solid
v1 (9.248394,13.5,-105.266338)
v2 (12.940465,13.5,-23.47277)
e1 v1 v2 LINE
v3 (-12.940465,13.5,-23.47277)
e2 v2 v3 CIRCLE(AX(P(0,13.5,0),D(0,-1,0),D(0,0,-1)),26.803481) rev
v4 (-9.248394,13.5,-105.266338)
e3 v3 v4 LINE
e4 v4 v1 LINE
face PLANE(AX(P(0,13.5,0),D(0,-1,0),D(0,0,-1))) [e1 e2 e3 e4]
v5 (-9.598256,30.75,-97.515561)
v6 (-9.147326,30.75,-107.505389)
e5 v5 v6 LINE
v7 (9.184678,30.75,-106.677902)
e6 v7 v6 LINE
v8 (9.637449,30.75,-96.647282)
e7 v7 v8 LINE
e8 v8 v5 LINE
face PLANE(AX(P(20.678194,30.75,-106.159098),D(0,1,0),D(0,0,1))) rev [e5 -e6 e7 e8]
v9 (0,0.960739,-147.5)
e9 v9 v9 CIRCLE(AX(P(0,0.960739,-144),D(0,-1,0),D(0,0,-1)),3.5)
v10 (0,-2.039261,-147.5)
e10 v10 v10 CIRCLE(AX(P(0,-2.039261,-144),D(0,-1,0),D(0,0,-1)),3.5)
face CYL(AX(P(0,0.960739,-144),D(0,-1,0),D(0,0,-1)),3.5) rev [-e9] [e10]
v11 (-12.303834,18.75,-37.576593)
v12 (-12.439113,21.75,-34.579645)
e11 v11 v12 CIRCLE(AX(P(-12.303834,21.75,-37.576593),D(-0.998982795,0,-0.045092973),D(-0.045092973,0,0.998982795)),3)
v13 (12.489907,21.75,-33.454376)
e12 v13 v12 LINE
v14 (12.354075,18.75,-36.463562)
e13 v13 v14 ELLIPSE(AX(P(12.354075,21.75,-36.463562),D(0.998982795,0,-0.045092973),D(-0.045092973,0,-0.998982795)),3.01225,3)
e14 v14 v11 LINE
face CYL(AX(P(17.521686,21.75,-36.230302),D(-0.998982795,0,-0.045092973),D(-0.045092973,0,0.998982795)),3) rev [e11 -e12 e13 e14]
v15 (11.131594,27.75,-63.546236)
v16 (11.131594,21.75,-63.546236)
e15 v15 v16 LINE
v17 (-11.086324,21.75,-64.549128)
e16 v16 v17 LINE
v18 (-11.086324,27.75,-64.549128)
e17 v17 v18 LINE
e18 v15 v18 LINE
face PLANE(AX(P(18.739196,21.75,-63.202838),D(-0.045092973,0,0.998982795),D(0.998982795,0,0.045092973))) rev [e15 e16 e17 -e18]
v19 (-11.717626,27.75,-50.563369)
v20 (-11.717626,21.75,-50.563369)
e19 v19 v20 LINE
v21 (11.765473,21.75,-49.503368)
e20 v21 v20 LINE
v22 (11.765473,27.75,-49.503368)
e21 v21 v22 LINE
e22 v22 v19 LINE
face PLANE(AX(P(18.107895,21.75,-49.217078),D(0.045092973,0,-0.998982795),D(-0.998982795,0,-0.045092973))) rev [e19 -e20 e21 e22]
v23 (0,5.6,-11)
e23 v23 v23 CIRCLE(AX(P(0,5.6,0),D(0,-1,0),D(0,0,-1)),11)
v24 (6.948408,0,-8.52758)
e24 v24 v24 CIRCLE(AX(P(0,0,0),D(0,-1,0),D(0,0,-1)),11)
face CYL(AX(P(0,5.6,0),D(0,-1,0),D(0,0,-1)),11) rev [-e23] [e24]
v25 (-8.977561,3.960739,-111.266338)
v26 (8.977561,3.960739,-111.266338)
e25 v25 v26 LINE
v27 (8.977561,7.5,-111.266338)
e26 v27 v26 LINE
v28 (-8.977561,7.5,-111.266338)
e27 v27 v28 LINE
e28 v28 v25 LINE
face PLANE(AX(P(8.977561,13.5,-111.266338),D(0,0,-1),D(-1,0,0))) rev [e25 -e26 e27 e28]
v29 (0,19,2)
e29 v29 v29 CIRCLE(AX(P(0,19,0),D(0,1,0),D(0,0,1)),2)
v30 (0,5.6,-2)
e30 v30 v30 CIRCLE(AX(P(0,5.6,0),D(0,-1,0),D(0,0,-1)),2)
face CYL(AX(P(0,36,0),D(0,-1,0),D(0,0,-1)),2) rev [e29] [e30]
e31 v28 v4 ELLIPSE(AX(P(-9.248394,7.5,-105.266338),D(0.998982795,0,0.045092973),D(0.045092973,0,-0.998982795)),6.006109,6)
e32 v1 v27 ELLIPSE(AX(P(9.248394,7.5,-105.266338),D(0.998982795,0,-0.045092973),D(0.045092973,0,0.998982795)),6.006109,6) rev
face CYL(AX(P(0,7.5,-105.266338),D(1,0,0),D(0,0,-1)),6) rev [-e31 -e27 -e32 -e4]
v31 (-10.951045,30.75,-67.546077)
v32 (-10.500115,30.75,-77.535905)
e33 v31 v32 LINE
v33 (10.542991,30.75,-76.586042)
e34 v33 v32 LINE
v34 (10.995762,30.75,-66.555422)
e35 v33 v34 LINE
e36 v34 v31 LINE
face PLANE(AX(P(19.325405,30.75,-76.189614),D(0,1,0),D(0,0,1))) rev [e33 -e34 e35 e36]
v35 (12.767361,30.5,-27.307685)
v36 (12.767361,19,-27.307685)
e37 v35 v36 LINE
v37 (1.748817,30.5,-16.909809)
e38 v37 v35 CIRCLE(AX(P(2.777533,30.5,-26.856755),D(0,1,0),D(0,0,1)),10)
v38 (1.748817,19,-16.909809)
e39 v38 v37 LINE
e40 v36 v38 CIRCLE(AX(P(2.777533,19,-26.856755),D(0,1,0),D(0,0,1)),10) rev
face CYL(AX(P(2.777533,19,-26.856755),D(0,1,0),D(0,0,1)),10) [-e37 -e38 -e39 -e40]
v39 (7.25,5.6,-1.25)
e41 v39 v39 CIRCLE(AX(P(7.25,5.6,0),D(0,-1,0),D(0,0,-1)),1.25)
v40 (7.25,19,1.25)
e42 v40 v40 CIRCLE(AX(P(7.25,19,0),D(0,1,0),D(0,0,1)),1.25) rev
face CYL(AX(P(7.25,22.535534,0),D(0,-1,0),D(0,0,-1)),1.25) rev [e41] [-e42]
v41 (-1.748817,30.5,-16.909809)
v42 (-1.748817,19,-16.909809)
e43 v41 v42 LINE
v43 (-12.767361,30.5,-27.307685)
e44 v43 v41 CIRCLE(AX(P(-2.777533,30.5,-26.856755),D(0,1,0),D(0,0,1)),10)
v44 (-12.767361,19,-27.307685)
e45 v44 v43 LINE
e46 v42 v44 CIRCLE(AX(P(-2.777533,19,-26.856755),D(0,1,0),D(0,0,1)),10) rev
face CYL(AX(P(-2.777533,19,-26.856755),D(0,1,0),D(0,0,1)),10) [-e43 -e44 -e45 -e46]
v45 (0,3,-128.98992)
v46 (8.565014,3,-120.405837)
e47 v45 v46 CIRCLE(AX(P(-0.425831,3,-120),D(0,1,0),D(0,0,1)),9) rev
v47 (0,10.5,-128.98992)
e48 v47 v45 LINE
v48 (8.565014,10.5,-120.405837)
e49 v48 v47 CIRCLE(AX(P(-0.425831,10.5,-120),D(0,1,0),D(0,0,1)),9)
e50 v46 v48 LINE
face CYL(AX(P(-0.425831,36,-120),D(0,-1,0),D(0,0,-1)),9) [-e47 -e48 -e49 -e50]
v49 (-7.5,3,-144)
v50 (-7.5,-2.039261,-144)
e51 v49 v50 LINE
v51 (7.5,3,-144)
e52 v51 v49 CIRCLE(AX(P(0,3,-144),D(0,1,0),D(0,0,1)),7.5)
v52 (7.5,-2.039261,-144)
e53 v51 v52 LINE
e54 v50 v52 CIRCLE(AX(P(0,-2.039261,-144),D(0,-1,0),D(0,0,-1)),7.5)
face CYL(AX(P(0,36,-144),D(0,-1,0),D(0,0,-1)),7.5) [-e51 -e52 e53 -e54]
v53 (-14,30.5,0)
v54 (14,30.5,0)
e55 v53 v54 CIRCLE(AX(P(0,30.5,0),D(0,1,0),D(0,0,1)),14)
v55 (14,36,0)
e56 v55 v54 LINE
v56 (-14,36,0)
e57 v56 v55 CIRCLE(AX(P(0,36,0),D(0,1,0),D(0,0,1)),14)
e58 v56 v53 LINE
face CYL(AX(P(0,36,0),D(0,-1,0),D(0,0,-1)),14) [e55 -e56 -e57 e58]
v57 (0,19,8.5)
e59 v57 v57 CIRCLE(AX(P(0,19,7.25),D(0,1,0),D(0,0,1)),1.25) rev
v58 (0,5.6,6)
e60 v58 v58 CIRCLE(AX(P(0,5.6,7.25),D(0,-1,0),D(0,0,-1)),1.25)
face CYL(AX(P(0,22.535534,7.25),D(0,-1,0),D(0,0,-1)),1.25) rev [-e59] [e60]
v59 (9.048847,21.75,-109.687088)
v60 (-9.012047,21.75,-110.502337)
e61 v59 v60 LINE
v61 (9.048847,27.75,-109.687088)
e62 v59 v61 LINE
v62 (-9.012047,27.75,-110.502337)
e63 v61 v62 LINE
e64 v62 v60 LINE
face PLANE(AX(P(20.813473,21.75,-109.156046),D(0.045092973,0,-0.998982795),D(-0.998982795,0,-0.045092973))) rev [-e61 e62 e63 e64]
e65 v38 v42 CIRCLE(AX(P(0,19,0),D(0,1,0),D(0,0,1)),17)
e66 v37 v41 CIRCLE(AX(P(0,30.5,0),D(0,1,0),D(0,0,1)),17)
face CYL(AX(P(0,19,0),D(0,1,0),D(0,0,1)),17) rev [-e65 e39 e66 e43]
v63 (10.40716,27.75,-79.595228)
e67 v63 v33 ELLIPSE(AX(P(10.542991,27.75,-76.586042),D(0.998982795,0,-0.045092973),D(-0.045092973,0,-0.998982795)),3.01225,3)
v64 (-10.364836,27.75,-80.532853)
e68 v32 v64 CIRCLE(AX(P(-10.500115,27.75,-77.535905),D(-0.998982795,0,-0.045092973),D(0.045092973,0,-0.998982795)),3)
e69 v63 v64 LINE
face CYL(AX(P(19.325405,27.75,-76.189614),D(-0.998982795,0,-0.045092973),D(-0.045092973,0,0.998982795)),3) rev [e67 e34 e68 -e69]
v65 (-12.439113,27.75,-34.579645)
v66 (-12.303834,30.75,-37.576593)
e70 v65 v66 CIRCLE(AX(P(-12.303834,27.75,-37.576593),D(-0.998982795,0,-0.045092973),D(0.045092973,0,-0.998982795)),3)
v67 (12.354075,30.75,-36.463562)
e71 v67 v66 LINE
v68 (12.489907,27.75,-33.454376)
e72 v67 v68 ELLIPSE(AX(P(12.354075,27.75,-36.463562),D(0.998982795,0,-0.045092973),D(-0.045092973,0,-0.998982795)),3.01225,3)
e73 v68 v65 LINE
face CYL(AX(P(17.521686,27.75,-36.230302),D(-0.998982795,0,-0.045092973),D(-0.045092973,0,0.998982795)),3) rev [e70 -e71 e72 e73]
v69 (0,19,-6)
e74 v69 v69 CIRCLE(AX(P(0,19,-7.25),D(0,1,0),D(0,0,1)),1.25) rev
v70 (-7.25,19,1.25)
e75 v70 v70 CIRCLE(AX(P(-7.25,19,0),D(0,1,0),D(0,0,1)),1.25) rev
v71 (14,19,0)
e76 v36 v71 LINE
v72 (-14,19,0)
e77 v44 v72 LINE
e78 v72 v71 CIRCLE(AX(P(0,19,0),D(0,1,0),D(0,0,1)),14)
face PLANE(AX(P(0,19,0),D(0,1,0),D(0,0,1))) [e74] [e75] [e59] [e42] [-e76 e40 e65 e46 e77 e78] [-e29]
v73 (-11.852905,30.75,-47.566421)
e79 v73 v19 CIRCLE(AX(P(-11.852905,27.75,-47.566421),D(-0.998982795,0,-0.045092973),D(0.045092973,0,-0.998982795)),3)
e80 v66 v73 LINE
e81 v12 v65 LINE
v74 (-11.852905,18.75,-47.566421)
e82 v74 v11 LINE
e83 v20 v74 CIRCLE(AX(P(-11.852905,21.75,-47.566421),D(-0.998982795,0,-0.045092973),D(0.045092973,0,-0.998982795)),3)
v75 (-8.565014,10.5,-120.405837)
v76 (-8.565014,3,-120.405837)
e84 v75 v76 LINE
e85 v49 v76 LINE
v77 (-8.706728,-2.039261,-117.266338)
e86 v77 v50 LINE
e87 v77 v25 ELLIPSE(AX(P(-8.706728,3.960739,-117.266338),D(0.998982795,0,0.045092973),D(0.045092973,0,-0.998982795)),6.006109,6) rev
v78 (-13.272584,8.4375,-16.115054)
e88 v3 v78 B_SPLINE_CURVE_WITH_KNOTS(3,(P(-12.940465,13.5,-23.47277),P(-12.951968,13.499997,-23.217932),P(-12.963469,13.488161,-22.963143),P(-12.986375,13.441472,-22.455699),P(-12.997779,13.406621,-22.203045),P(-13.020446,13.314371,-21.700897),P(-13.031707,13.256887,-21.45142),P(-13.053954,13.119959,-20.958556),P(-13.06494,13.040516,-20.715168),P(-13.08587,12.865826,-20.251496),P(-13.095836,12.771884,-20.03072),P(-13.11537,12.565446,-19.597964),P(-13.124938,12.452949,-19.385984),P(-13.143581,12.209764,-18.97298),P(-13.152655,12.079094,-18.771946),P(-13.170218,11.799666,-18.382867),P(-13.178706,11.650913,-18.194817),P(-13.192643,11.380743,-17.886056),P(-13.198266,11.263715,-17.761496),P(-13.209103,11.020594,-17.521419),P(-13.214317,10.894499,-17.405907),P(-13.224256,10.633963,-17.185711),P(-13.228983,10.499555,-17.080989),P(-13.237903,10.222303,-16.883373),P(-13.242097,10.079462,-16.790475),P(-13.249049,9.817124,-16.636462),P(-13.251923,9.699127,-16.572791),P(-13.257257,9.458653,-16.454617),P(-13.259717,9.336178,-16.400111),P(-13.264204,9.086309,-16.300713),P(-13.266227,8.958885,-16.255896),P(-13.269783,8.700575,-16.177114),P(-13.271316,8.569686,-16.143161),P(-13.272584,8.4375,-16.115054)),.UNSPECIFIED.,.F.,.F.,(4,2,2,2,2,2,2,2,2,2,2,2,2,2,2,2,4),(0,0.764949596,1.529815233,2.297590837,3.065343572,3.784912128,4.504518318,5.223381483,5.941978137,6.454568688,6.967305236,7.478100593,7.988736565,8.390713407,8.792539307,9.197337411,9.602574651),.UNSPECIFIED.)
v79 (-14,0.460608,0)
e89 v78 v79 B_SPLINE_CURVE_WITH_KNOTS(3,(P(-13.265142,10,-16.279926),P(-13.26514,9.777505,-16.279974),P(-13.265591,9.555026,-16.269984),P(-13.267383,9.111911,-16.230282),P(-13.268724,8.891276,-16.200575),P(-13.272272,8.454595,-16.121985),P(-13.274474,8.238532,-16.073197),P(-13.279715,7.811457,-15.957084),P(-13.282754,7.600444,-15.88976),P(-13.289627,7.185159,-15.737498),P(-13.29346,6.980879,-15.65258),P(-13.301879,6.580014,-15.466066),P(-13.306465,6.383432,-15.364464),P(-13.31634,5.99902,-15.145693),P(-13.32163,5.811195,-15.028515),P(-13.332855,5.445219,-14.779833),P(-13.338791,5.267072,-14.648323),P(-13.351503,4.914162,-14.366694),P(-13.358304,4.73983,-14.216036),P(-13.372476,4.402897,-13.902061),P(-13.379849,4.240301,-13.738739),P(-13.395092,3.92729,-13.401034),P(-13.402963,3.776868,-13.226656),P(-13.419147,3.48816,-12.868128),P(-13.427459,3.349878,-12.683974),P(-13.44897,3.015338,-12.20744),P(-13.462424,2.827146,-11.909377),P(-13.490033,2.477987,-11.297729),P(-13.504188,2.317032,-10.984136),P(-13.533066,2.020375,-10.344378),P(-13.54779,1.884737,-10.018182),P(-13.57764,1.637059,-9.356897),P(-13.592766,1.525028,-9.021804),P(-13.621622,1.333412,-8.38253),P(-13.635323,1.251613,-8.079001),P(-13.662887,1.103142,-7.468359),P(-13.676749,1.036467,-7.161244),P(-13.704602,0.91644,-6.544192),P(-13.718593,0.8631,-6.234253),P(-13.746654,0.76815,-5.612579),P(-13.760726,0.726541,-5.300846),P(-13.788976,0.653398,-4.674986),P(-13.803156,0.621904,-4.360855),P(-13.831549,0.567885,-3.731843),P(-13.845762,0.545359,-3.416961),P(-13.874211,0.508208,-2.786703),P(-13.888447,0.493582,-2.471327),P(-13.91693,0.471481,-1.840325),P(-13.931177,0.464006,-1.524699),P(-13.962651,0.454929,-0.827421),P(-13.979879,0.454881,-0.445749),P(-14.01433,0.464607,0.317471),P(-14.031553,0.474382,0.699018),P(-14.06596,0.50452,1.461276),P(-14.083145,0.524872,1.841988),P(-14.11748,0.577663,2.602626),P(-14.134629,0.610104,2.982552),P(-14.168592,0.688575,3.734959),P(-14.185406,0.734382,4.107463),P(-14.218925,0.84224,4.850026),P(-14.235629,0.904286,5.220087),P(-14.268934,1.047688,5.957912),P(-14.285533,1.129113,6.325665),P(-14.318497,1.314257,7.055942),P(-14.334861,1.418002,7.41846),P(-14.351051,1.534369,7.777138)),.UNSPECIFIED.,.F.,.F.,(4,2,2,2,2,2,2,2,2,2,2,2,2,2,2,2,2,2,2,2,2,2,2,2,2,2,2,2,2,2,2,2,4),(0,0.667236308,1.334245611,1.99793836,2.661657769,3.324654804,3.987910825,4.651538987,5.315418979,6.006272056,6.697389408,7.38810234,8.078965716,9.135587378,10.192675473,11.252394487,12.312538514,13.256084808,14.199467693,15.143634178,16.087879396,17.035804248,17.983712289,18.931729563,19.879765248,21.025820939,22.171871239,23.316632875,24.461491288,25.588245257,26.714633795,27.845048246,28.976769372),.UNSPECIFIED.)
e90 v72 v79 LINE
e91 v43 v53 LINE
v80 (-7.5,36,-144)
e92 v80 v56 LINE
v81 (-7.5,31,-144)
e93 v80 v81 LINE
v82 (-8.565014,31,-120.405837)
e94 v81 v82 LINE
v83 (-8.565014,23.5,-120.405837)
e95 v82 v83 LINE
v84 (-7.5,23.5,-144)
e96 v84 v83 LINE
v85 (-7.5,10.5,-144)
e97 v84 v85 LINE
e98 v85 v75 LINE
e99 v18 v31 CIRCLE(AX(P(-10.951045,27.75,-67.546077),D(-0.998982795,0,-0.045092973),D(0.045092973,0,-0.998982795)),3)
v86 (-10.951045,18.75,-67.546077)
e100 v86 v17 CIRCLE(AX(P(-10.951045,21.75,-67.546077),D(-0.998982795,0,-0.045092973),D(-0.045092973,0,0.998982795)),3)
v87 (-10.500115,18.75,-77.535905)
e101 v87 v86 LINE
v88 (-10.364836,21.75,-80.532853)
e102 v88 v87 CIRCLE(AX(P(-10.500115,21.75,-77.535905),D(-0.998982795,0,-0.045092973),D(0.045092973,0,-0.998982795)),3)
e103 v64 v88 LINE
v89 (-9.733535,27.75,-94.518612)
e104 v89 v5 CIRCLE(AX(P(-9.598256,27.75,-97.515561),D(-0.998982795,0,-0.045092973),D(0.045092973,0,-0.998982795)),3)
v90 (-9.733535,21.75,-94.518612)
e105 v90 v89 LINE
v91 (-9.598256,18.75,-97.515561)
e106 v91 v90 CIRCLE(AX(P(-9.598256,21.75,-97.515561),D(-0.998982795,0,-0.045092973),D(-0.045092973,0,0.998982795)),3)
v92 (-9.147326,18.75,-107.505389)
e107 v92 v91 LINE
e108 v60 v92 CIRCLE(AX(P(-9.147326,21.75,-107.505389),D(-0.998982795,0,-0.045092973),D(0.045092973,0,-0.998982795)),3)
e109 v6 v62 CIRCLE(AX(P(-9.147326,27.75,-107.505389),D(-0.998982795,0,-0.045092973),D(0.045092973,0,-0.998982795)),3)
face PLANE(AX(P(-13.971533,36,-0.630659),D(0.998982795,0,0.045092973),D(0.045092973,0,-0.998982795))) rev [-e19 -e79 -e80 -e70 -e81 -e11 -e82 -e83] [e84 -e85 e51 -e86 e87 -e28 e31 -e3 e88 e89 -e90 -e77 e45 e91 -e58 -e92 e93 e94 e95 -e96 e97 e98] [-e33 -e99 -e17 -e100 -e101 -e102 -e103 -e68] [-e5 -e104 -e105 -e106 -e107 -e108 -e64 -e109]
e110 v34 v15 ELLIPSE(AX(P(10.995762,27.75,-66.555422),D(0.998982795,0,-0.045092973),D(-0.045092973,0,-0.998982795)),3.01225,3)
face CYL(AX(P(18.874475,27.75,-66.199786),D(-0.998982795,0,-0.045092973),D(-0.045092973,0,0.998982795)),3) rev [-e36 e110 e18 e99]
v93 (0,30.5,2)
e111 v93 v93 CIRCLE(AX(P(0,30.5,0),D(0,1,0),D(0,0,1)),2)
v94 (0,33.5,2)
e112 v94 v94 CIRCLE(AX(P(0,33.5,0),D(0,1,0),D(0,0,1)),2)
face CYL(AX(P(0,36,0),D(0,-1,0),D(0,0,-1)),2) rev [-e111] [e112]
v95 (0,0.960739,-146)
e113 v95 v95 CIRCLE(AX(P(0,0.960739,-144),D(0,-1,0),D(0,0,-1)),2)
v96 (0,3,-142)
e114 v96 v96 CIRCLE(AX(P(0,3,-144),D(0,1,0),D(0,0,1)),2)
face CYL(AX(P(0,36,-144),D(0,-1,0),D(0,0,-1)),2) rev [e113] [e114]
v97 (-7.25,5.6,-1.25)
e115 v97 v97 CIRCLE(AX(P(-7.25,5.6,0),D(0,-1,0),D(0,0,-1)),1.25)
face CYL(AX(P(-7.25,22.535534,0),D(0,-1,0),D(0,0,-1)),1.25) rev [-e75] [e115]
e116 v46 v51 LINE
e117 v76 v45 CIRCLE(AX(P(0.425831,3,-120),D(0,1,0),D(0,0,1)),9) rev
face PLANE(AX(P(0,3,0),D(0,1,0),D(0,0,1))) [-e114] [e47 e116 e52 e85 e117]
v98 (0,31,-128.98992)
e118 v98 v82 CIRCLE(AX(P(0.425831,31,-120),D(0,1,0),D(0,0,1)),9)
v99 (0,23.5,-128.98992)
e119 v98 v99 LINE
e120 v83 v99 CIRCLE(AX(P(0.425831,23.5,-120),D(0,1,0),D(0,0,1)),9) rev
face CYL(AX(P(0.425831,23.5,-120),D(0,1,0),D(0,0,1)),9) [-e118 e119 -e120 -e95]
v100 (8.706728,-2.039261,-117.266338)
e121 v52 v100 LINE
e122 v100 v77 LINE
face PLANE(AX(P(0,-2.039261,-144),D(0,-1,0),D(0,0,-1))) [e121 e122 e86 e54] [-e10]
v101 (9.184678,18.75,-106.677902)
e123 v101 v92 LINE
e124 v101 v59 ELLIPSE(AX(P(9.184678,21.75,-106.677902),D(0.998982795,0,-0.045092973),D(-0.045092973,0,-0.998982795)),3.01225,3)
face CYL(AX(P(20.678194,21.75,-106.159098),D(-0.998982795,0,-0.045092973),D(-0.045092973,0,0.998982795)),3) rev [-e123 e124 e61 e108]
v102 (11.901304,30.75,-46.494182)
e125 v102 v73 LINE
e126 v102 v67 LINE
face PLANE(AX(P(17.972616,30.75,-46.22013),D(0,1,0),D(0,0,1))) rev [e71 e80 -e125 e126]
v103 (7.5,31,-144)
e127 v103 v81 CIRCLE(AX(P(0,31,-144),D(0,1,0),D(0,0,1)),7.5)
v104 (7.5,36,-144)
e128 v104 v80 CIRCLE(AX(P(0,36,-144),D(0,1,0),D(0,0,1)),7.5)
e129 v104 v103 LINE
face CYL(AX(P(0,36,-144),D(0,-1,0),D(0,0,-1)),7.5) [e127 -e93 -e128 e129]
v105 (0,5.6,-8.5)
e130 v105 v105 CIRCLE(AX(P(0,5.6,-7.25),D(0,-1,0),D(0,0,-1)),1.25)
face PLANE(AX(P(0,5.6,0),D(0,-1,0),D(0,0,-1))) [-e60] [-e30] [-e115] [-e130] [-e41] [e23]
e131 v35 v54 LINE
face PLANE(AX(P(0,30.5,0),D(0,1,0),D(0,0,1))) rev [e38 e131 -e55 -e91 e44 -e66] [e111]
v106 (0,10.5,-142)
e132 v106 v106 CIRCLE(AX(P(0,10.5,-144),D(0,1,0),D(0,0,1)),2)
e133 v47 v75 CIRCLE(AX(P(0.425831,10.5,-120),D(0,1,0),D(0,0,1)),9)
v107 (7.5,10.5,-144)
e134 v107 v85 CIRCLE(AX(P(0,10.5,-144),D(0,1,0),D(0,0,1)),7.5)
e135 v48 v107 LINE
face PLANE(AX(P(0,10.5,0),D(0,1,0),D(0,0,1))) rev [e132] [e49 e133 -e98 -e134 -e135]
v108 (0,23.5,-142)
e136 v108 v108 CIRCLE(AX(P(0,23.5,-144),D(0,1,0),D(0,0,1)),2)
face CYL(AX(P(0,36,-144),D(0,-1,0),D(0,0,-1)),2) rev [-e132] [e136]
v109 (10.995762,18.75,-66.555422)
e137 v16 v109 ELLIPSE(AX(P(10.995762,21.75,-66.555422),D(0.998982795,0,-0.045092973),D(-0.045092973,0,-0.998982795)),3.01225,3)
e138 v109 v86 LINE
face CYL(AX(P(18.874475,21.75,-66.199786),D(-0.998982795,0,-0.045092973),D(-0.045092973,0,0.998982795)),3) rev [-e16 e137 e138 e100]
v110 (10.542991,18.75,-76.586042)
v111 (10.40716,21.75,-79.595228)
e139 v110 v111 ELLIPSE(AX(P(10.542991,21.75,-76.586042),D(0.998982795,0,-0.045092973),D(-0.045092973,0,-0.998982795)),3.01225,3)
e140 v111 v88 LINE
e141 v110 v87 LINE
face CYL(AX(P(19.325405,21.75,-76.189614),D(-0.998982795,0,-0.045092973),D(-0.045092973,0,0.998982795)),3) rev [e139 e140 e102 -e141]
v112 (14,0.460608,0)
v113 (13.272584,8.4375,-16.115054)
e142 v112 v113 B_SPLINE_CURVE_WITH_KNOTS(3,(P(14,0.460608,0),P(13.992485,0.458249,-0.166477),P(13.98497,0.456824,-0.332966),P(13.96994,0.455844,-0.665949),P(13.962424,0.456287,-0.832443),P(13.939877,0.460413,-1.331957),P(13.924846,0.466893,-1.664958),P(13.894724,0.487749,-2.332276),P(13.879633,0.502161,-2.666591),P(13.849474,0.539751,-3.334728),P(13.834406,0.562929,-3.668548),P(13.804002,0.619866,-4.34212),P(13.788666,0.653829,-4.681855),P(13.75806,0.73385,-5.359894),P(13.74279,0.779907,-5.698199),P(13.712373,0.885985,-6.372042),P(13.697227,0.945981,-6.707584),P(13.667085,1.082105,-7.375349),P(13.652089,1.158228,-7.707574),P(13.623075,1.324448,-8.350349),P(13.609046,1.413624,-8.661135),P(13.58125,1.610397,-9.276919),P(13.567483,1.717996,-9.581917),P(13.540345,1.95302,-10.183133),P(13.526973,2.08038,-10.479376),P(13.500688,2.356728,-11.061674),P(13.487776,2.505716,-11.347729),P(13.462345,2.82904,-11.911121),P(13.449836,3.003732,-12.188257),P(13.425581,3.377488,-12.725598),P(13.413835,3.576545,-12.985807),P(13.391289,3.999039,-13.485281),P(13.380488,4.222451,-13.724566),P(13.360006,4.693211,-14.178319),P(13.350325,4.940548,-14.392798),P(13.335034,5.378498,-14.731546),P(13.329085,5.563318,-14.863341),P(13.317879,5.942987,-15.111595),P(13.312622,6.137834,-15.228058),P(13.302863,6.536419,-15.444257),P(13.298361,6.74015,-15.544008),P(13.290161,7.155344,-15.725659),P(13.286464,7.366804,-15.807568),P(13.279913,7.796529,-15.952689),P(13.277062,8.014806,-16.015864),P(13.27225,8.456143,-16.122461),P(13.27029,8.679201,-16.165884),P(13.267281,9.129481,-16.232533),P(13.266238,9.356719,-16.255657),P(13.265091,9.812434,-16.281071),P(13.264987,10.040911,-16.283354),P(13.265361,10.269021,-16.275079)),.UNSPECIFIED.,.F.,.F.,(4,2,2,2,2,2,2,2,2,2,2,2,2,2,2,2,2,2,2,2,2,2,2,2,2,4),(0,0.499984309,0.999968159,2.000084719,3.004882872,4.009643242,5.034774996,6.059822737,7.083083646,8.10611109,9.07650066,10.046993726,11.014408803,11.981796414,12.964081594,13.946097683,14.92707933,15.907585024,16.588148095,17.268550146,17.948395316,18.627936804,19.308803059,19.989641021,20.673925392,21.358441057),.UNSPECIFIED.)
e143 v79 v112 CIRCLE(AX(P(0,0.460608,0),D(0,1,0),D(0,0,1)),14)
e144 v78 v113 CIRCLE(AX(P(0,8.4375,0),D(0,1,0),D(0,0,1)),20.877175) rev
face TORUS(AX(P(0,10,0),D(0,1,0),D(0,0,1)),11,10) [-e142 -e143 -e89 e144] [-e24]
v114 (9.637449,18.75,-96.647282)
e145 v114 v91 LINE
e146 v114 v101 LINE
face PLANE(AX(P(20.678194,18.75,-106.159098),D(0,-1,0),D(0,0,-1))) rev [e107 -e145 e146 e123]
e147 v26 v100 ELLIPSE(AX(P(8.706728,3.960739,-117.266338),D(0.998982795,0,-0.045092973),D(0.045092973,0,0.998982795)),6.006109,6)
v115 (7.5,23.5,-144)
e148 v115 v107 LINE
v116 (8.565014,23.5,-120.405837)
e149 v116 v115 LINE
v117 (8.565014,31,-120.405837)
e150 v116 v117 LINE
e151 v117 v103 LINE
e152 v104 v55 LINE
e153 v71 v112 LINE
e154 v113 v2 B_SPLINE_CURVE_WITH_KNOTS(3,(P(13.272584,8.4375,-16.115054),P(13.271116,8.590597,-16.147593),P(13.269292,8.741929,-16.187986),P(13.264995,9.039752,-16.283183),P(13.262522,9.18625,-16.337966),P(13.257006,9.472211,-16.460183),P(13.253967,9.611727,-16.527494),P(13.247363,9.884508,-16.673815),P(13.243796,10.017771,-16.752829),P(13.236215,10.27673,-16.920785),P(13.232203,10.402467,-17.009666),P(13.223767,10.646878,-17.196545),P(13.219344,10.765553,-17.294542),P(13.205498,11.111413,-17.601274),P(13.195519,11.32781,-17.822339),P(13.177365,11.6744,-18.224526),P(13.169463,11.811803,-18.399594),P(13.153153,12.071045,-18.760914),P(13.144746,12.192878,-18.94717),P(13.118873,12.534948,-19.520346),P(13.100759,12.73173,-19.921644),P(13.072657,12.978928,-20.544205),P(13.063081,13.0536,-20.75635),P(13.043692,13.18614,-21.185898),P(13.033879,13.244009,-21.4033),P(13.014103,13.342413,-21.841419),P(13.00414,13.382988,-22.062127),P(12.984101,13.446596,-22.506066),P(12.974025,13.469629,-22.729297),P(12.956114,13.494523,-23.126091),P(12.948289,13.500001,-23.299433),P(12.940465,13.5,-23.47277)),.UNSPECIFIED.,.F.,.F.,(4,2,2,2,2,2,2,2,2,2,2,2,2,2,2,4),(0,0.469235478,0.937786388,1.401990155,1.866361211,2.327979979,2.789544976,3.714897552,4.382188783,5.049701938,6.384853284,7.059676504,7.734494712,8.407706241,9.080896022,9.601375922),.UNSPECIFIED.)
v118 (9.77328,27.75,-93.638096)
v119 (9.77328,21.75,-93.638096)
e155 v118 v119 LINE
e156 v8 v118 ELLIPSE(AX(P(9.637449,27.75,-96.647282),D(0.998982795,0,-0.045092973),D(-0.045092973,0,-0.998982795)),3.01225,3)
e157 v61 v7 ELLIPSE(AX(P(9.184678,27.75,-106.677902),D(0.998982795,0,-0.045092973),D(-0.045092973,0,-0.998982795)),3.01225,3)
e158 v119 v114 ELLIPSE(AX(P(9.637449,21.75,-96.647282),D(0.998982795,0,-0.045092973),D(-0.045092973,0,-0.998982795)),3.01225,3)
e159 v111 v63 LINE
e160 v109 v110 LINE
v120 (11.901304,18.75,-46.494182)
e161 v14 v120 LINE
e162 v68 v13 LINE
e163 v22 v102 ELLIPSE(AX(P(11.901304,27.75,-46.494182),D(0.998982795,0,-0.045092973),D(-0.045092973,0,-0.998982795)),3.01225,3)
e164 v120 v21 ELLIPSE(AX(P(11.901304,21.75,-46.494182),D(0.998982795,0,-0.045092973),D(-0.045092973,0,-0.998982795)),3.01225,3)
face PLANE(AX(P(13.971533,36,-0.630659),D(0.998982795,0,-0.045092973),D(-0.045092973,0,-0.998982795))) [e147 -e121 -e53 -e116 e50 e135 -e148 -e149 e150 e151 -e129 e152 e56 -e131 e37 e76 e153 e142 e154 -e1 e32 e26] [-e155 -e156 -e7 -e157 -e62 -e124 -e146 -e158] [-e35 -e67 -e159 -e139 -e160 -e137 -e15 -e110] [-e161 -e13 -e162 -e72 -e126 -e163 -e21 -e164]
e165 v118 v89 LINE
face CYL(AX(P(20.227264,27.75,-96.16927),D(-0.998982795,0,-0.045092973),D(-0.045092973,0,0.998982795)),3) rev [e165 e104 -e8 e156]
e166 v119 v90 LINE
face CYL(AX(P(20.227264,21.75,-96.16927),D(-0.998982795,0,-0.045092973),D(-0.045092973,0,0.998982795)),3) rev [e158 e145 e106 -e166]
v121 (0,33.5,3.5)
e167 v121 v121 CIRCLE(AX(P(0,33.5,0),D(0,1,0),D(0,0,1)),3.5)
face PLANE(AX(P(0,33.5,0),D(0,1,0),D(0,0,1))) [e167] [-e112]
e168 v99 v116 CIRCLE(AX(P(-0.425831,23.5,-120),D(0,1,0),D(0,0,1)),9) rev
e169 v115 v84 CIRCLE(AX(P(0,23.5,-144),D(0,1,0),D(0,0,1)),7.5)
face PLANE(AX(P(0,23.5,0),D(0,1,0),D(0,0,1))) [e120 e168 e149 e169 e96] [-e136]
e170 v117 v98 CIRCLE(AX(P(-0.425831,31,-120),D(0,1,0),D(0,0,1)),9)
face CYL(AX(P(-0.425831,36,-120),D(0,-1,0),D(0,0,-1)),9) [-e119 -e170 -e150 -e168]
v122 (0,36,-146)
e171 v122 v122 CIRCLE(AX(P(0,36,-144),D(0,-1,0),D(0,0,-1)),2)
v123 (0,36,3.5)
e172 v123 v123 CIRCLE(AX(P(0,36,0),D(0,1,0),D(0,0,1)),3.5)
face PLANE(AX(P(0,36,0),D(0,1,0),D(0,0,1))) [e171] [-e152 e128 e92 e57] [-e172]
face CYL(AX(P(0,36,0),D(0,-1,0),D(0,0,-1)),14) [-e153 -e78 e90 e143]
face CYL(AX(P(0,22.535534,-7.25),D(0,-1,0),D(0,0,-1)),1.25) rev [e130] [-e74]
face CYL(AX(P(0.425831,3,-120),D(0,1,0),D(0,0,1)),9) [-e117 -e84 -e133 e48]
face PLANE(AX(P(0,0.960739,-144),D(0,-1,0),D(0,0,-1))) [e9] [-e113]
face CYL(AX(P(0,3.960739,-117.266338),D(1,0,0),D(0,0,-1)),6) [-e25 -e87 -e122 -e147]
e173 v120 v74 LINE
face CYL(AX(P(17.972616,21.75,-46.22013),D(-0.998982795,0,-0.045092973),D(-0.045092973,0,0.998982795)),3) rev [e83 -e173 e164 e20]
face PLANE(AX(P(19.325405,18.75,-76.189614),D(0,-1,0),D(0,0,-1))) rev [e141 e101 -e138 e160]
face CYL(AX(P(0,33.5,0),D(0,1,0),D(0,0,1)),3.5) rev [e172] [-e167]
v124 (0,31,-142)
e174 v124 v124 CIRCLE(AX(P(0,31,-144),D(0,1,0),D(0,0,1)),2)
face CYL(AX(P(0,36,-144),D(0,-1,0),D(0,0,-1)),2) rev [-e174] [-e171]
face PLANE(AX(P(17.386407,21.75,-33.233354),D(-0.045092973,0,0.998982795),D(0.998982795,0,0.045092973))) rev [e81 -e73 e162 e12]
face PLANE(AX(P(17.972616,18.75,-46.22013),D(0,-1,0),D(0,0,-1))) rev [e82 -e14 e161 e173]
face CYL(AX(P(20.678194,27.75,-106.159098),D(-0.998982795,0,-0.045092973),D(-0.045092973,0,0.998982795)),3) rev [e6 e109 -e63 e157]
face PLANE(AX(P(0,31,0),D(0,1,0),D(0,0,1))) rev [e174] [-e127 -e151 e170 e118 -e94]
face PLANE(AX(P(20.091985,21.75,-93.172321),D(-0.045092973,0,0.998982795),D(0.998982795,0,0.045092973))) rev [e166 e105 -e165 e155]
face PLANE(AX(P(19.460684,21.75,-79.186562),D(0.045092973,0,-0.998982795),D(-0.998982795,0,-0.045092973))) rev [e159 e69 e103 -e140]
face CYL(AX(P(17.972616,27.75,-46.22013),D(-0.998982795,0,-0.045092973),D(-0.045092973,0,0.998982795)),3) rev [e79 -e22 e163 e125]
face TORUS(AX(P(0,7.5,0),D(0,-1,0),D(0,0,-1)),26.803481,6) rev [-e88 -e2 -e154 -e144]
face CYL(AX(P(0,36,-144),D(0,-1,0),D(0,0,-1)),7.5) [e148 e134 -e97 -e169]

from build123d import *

# Parameters (mm, degrees)
BOSS_EXTRUDE1_DEPTH = 36
CUT_EXTRUDE1_START  = -5.5
SKETCH2_R           = 17
CUT_EXTRUDE1_DEPTH  = 11.5
FILLET1_R           = 10
SKETCH3_R           = 11
CUT_EXTRUDE2_DEPTH  = 5.6
SKETCH4_R           = 1.25
CUT_EXTRUDE3_DEPTH  = 13.4
SKETCH5_R           = 2
CUT_EXTRUDE4_DEPTH  = 156.152860109
CUT_EXTRUDE5_START  = -2.5
SKETCH6_R           = 3.5
SKETCH6_R_2         = 2
CUT_EXTRUDE5_DEPTH  = 2.5
CUT_EXTRUDE6_START  = -12.5
CUT_EXTRUDE6_DEPTH  = 7.5
LPATTERN1_COUNT     = 2
LPATTERN1_PITCH     = 20.5
SKETCH8_R           = 2
CUT_EXTRUDE7_DEPTH  = 157.346570157
FILLET2_R           = 9
CUT_EXTRUDE8_DEPTH  = 13.5
BOSS_EXTRUDE2_START = 2.039261455
BOSS_EXTRUDE2_DEPTH = 2.039261455
SKETCH15_R          = 2
CUT_EXTRUDE9_DEPTH  = 157.828681726
SKETCH17_R          = 3.5
SKETCH17_R_2        = 2
CUT_EXTRUDE10_DEPTH = 3
FILLET4_R           = 6
CUT_EXTRUDE11_DEPTH = 158.606994039


with BuildPart() as part:
    # Sketch1 → Boss-Extrude1 (new body)
    with BuildSketch(Plane(origin=(0, 0, 0), x_dir=(1, 0, 0), z_dir=(0, 1, 0))):
        with BuildLine():
            ThreePointArc((7.5, 144), (0, 151.5), (-7.5, 144))
            Line((-7.5, 144), (-14, 0))
            ThreePointArc((-14, 0), (0, -14), (14, 0))
            Line((14, 0), (7.5, 144))
        make_face()
    extrude(amount=BOSS_EXTRUDE1_DEPTH)

    # Sketch2 → Cut-Extrude1 (cut)
    with BuildSketch(Plane(origin=(0, 36, 0), x_dir=(1, 0, 0), z_dir=(0, 1, 0)).offset(CUT_EXTRUDE1_START)):
        Circle(SKETCH2_R)
    extrude(amount=-CUT_EXTRUDE1_DEPTH, mode=Mode.SUBTRACT)

    # Fillet1
    fillet1_edges = [part.edges().sort_by_distance(p)[0] for p in [
        (-13.535741066, 24.75, -10.28512099),
        (13.535741066, 24.75, -10.28512099),
    ]]
    fillet(fillet1_edges, radius=FILLET1_R)

    # Sketch3 → Cut-Extrude2 (cut)
    with BuildSketch(Plane.XZ):
        with Locations(Location((0, 0, 0), (0, 0, 270))):
            Circle(SKETCH3_R)
    extrude(amount=-CUT_EXTRUDE2_DEPTH, mode=Mode.SUBTRACT)

    # Sketch4 → Cut-Extrude3 (cut)
    with BuildSketch(Plane.XZ.offset(-5.6)):
        with Locations(Location((0, -7.25, 0), (0, 0, 270))):
            Circle(SKETCH4_R)
        with Locations(Location((-7.25, 0, 0), (0, 0, 270))):
            Circle(SKETCH4_R)
        with Locations(Location((0, 7.25, 0), (0, 0, 270))):
            Circle(SKETCH4_R)
        with Locations(Location((7.25, 0, 0), (0, 0, 270))):
            Circle(SKETCH4_R)
    extrude(amount=-CUT_EXTRUDE3_DEPTH, mode=Mode.SUBTRACT)

    # Sketch5 → Cut-Extrude4 (cut, through all)
    with BuildSketch(Plane.XZ.offset(-5.6)):
        with Locations(Location((0, 0, 0), (0, 0, 270))):
            Circle(SKETCH5_R)
    extrude(amount=-CUT_EXTRUDE4_DEPTH, mode=Mode.SUBTRACT)

    # Sketch6 → Cut-Extrude5 (cut)
    with BuildSketch(Plane(origin=(0, 36, 0), x_dir=(1, 0, 0), z_dir=(0, 1, 0)).offset(CUT_EXTRUDE5_START)):
        with Locations(Location((0, 0, 0), (0, 0, 270))):
            Circle(SKETCH6_R)
        with Locations(Location((0, 0, 0), (0, 0, 270))):
            Circle(SKETCH6_R_2, mode=Mode.SUBTRACT)
    extrude(amount=CUT_EXTRUDE5_DEPTH, mode=Mode.SUBTRACT)

    # Sketch7 → Cut-Extrude6 (cut)
    with BuildSketch(Plane(origin=(0, 36, 0), x_dir=(1, 0, 0), z_dir=(0, 1, 0)).offset(CUT_EXTRUDE6_START)):
        with BuildLine():
            Line((-7.5, 144), (-8.177083333, 129))
            Line((-8.177083333, 129), (8.177083333, 129))
            Line((8.177083333, 129), (7.5, 144))
            ThreePointArc((7.5, 144), (0, 151.5), (-7.5, 144))
        make_face()
    cut_extrude6 = extrude(amount=CUT_EXTRUDE6_DEPTH, mode=Mode.SUBTRACT)

    # LPattern1: Cut-Extrude6 ×2
    with Locations(*[(0, -i * LPATTERN1_PITCH, 0) for i in range(1, LPATTERN1_COUNT)]):
        add(cut_extrude6, mode=Mode.SUBTRACT)

    # Sketch8 → Cut-Extrude7 (cut, through all)
    with BuildSketch(Plane.XZ):
        with Locations(Location((0, -144, 0), (0, 0, 90))):
            Circle(SKETCH8_R)
    extrude(amount=-CUT_EXTRUDE7_DEPTH, mode=Mode.SUBTRACT)

    # Fillet2
    # the kernel refuses this fillet: 9 mm, written as the material it takes off along each edge
    with BuildSketch(Plane(origin=(-8.177083333, 1.992714572, -129), x_dir=(1, 0, 0), z_dir=(0, 1, 0))) as fillet2_piece_1_section:
        with BuildLine():
            CenterArc((FILLET2_R * 0.955879352349, -FILLET2_R), FILLET2_R, 90, 87.415486554)
            Line((-FILLET2_R * 0.0431034421745, -FILLET2_R * 0.954907026636), (0, 0))
            Line((0, 0), (FILLET2_R * 0.955879352349, 0))
        make_face()
    fillet2_piece_1 = extrude(amount=50.514570856, mode=Mode.PRIVATE)
    fillet2_piece_1 = split(fillet2_piece_1, bisect_by=Plane(origin=(-8.177083333, 3, -129), z_dir=(0, 1, 0)), keep=Keep.TOP, mode=Mode.PRIVATE)
    fillet2_piece_1 = split(fillet2_piece_1, bisect_by=Plane(origin=(-8.177083333, 10.5, -129), z_dir=(0, -1, 0)), keep=Keep.TOP, mode=Mode.PRIVATE)
    add(fillet2_piece_1, mode=Mode.SUBTRACT)
    with BuildSketch(Plane(origin=(-8.177083333, 23.5, -129), x_dir=(1, 0, 0), z_dir=(0, 1, 0)), Plane(origin=(-8.177083333, 3, -129), x_dir=(1, 0, 0), z_dir=(0, 1, 0)), Plane(origin=(8.177083333, 23.5, -129), x_dir=(0.04509297336389057, 0, 0.9989827945231107), z_dir=(0, 1, 0)), Plane(origin=(8.177083333, 3, -129), x_dir=(0.04509297336389057, 0, 0.9989827945231107), z_dir=(0, 1, 0))) as fillet2_piece_2:
        with BuildLine():
            CenterArc((FILLET2_R * 0.955879352349, -FILLET2_R), FILLET2_R, 90, 87.415486554)
            Line((-FILLET2_R * 0.0431034421745, -FILLET2_R * 0.954907026636), (0, 0))
            Line((0, 0), (FILLET2_R * 0.955879352349, 0))
        make_face()
    extrude(amount=7.5, mode=Mode.SUBTRACT)
    with BuildSketch(Plane(origin=(-8.177083333, -18.507285428, -129), x_dir=(1, 0, 0), z_dir=(0, 1, 0))) as fillet2_piece_3_section:
        with BuildLine():
            CenterArc((FILLET2_R * 0.955879352349, -FILLET2_R), FILLET2_R, 90, 87.415486554)
            Line((-FILLET2_R * 0.0431034421745, -FILLET2_R * 0.954907026636), (0, 0))
            Line((0, 0), (FILLET2_R * 0.955879352349, 0))
        make_face()
    fillet2_piece_3 = extrude(amount=50.514570856, mode=Mode.PRIVATE)
    fillet2_piece_3 = split(fillet2_piece_3, bisect_by=Plane(origin=(-8.177083333, 23.5, -129), z_dir=(0, 1, 0)), keep=Keep.TOP, mode=Mode.PRIVATE)
    fillet2_piece_3 = split(fillet2_piece_3, bisect_by=Plane(origin=(-8.177083333, 31, -129), z_dir=(0, -1, 0)), keep=Keep.TOP, mode=Mode.PRIVATE)
    add(fillet2_piece_3, mode=Mode.SUBTRACT)
    with BuildSketch(Plane(origin=(8.177083333, 1.992714572, -129), x_dir=(0.04509297336389057, 0, 0.9989827945231107), z_dir=(0, 1, 0))) as fillet2_piece_4_section:
        with BuildLine():
            CenterArc((FILLET2_R * 0.955879352349, -FILLET2_R), FILLET2_R, 90, 87.415486554)
            Line((-FILLET2_R * 0.0431034421745, -FILLET2_R * 0.954907026636), (0, 0))
            Line((0, 0), (FILLET2_R * 0.955879352349, 0))
        make_face()
    fillet2_piece_4 = extrude(amount=50.514570856, mode=Mode.PRIVATE)
    fillet2_piece_4 = split(fillet2_piece_4, bisect_by=Plane(origin=(8.177083333, 3, -129), z_dir=(0, 1, 0)), keep=Keep.TOP, mode=Mode.PRIVATE)
    fillet2_piece_4 = split(fillet2_piece_4, bisect_by=Plane(origin=(8.177083333, 10.5, -129), z_dir=(0, -1, 0)), keep=Keep.TOP, mode=Mode.PRIVATE)
    add(fillet2_piece_4, mode=Mode.SUBTRACT)
    with BuildSketch(Plane(origin=(8.177083333, -18.507285428, -129), x_dir=(0.04509297336389057, 0, 0.9989827945231107), z_dir=(0, 1, 0))) as fillet2_piece_5_section:
        with BuildLine():
            CenterArc((FILLET2_R * 0.955879352349, -FILLET2_R), FILLET2_R, 90, 87.415486554)
            Line((-FILLET2_R * 0.0431034421745, -FILLET2_R * 0.954907026636), (0, 0))
            Line((0, 0), (FILLET2_R * 0.955879352349, 0))
        make_face()
    fillet2_piece_5 = extrude(amount=50.514570856, mode=Mode.PRIVATE)
    fillet2_piece_5 = split(fillet2_piece_5, bisect_by=Plane(origin=(8.177083333, 23.5, -129), z_dir=(0, 1, 0)), keep=Keep.TOP, mode=Mode.PRIVATE)
    fillet2_piece_5 = split(fillet2_piece_5, bisect_by=Plane(origin=(8.177083333, 31, -129), z_dir=(0, -1, 0)), keep=Keep.TOP, mode=Mode.PRIVATE)
    add(fillet2_piece_5, mode=Mode.SUBTRACT)

    # Sketch9 → Cut-Extrude8 (cut)
    with BuildSketch(Plane.XZ):
        with BuildLine():
            Line((8.977561109, -111.266338499), (-8.977561109, -111.266338499))
            Line((-8.977561109, -111.266338499), (-13.265142213, -16.279926353))
            ThreePointArc((-13.265142213, -16.279926353), (0, -21), (13.265142213, -16.279926353))
            Line((13.265142213, -16.279926353), (8.977561109, -111.266338499))
        make_face()
    extrude(amount=-CUT_EXTRUDE8_DEPTH, mode=Mode.SUBTRACT)

    # Sketch10 → Boss-Extrude2 (add)
    with BuildSketch(Plane.XZ.offset(BOSS_EXTRUDE2_START)):
        with BuildLine():
            Line((7.5, -144), (8.977561109, -111.266338499))
            Line((8.977561109, -111.266338499), (-8.977561109, -111.266338499))
            Line((-8.977561109, -111.266338499), (-7.5, -144))
            ThreePointArc((-7.5, -144), (0, -151.5), (7.5, -144))
        make_face()
    extrude(amount=-BOSS_EXTRUDE2_DEPTH)

    # Sketch15 → Cut-Extrude9 (cut, through all)
    with BuildSketch(Plane(origin=(0, 36, 0), x_dir=(1, 0, 0), z_dir=(0, 1, 0))):
        with Locations(Location((0, 144, 0), (0, 0, 270))):
            Circle(SKETCH15_R)
    extrude(amount=-CUT_EXTRUDE9_DEPTH, mode=Mode.SUBTRACT)

    # Sketch17 → Cut-Extrude10 (cut)
    with BuildSketch(Plane.XZ.offset(2.039261455)):
        with Locations(Location((0, -144, 0), (0, 0, 270))):
            Circle(SKETCH17_R)
        with Locations(Location((0, -144, 0), (0, 0, 270))):
            Circle(SKETCH17_R_2, mode=Mode.SUBTRACT)
    extrude(amount=-CUT_EXTRUDE10_DEPTH, mode=Mode.SUBTRACT)

    # Fillet3: read off the stored shape, not the designer's step
    # Fillet3 outline → Fillet3 (revolve, cut)
    with BuildSketch(Plane.XY):
        with BuildLine():
            ThreePointArc((21, 10), (18.071067812, 2.928932188), (11, 0))
            Line((11, 0), (21, 0))
            Line((21, 0), (21, 10))
        make_face()
    revolve(axis=Axis((0, 0, 0), (0, 1, 0)), mode=Mode.SUBTRACT)

    # Fillet4
    fillet4_edges = [part.edges().sort_by_distance(p)[0] for p in [
        (0, 13.5, -21),
        (0, 13.5, -111.266338499),
        (0, -2.039261455, -111.266338499),
    ]]
    fillet(fillet4_edges, radius=FILLET4_R)

    # Sketch18 → Cut-Extrude11 (cut, through all)
    with BuildSketch(Plane(origin=(-13.971532733, 0, -0.630659464), x_dir=(-0.04509297336389045, 0, 0.9989827945231107), z_dir=(-0.9989827945231108, 0, -0.04509297336389045))):
        with BuildLine():
            Line((-79.983553336, 21.75), (-79.983553336, 27.75))
            ThreePointArc((-79.983553336, 27.75), (-79.10487368, 29.871320344), (-76.983553336, 30.75))
            Line((-76.983553336, 30.75), (-66.983553336, 30.75))
            ThreePointArc((-66.983553336, 30.75), (-64.862232993, 29.871320344), (-63.983553336, 27.75))
            Line((-63.983553336, 27.75), (-63.983553336, 21.75))
            ThreePointArc((-63.983553336, 21.75), (-64.862232993, 19.628679656), (-66.983553336, 18.75))
            Line((-66.983553336, 18.75), (-76.983553336, 18.75))
            ThreePointArc((-76.983553336, 18.75), (-79.10487368, 19.628679656), (-79.983553336, 21.75))
        make_face()
        with BuildLine():
            Line((-106.983553336, 18.75), (-96.983553336, 18.75))
            ThreePointArc((-96.983553336, 18.75), (-94.862232993, 19.628679656), (-93.983553336, 21.75))
            Line((-93.983553336, 21.75), (-93.983553336, 27.75))
            ThreePointArc((-93.983553336, 27.75), (-94.862232993, 29.871320344), (-96.983553336, 30.75))
            Line((-96.983553336, 30.75), (-106.983553336, 30.75))
            ThreePointArc((-106.983553336, 30.75), (-109.10487368, 29.871320344), (-109.983553336, 27.75))
            Line((-109.983553336, 27.75), (-109.983553336, 21.75))
            ThreePointArc((-109.983553336, 21.75), (-109.10487368, 19.628679656), (-106.983553336, 18.75))
        make_face()
        with BuildLine():
            Line((-49.983553336, 21.75), (-49.983553336, 27.75))
            ThreePointArc((-49.983553336, 27.75), (-49.10487368, 29.871320344), (-46.983553336, 30.75))
            Line((-46.983553336, 30.75), (-36.983553336, 30.75))
            ThreePointArc((-36.983553336, 30.75), (-34.862232993, 29.871320344), (-33.983553336, 27.75))
            Line((-33.983553336, 27.75), (-33.983553336, 21.75))
            ThreePointArc((-33.983553336, 21.75), (-34.862232993, 19.628679656), (-36.983553336, 18.75))
            Line((-36.983553336, 18.75), (-46.983553336, 18.75))
            ThreePointArc((-46.983553336, 18.75), (-49.10487368, 19.628679656), (-49.983553336, 21.75))
        make_face()
    extrude(amount=-CUT_EXTRUDE11_DEPTH, mode=Mode.SUBTRACT)


solid = part.part
